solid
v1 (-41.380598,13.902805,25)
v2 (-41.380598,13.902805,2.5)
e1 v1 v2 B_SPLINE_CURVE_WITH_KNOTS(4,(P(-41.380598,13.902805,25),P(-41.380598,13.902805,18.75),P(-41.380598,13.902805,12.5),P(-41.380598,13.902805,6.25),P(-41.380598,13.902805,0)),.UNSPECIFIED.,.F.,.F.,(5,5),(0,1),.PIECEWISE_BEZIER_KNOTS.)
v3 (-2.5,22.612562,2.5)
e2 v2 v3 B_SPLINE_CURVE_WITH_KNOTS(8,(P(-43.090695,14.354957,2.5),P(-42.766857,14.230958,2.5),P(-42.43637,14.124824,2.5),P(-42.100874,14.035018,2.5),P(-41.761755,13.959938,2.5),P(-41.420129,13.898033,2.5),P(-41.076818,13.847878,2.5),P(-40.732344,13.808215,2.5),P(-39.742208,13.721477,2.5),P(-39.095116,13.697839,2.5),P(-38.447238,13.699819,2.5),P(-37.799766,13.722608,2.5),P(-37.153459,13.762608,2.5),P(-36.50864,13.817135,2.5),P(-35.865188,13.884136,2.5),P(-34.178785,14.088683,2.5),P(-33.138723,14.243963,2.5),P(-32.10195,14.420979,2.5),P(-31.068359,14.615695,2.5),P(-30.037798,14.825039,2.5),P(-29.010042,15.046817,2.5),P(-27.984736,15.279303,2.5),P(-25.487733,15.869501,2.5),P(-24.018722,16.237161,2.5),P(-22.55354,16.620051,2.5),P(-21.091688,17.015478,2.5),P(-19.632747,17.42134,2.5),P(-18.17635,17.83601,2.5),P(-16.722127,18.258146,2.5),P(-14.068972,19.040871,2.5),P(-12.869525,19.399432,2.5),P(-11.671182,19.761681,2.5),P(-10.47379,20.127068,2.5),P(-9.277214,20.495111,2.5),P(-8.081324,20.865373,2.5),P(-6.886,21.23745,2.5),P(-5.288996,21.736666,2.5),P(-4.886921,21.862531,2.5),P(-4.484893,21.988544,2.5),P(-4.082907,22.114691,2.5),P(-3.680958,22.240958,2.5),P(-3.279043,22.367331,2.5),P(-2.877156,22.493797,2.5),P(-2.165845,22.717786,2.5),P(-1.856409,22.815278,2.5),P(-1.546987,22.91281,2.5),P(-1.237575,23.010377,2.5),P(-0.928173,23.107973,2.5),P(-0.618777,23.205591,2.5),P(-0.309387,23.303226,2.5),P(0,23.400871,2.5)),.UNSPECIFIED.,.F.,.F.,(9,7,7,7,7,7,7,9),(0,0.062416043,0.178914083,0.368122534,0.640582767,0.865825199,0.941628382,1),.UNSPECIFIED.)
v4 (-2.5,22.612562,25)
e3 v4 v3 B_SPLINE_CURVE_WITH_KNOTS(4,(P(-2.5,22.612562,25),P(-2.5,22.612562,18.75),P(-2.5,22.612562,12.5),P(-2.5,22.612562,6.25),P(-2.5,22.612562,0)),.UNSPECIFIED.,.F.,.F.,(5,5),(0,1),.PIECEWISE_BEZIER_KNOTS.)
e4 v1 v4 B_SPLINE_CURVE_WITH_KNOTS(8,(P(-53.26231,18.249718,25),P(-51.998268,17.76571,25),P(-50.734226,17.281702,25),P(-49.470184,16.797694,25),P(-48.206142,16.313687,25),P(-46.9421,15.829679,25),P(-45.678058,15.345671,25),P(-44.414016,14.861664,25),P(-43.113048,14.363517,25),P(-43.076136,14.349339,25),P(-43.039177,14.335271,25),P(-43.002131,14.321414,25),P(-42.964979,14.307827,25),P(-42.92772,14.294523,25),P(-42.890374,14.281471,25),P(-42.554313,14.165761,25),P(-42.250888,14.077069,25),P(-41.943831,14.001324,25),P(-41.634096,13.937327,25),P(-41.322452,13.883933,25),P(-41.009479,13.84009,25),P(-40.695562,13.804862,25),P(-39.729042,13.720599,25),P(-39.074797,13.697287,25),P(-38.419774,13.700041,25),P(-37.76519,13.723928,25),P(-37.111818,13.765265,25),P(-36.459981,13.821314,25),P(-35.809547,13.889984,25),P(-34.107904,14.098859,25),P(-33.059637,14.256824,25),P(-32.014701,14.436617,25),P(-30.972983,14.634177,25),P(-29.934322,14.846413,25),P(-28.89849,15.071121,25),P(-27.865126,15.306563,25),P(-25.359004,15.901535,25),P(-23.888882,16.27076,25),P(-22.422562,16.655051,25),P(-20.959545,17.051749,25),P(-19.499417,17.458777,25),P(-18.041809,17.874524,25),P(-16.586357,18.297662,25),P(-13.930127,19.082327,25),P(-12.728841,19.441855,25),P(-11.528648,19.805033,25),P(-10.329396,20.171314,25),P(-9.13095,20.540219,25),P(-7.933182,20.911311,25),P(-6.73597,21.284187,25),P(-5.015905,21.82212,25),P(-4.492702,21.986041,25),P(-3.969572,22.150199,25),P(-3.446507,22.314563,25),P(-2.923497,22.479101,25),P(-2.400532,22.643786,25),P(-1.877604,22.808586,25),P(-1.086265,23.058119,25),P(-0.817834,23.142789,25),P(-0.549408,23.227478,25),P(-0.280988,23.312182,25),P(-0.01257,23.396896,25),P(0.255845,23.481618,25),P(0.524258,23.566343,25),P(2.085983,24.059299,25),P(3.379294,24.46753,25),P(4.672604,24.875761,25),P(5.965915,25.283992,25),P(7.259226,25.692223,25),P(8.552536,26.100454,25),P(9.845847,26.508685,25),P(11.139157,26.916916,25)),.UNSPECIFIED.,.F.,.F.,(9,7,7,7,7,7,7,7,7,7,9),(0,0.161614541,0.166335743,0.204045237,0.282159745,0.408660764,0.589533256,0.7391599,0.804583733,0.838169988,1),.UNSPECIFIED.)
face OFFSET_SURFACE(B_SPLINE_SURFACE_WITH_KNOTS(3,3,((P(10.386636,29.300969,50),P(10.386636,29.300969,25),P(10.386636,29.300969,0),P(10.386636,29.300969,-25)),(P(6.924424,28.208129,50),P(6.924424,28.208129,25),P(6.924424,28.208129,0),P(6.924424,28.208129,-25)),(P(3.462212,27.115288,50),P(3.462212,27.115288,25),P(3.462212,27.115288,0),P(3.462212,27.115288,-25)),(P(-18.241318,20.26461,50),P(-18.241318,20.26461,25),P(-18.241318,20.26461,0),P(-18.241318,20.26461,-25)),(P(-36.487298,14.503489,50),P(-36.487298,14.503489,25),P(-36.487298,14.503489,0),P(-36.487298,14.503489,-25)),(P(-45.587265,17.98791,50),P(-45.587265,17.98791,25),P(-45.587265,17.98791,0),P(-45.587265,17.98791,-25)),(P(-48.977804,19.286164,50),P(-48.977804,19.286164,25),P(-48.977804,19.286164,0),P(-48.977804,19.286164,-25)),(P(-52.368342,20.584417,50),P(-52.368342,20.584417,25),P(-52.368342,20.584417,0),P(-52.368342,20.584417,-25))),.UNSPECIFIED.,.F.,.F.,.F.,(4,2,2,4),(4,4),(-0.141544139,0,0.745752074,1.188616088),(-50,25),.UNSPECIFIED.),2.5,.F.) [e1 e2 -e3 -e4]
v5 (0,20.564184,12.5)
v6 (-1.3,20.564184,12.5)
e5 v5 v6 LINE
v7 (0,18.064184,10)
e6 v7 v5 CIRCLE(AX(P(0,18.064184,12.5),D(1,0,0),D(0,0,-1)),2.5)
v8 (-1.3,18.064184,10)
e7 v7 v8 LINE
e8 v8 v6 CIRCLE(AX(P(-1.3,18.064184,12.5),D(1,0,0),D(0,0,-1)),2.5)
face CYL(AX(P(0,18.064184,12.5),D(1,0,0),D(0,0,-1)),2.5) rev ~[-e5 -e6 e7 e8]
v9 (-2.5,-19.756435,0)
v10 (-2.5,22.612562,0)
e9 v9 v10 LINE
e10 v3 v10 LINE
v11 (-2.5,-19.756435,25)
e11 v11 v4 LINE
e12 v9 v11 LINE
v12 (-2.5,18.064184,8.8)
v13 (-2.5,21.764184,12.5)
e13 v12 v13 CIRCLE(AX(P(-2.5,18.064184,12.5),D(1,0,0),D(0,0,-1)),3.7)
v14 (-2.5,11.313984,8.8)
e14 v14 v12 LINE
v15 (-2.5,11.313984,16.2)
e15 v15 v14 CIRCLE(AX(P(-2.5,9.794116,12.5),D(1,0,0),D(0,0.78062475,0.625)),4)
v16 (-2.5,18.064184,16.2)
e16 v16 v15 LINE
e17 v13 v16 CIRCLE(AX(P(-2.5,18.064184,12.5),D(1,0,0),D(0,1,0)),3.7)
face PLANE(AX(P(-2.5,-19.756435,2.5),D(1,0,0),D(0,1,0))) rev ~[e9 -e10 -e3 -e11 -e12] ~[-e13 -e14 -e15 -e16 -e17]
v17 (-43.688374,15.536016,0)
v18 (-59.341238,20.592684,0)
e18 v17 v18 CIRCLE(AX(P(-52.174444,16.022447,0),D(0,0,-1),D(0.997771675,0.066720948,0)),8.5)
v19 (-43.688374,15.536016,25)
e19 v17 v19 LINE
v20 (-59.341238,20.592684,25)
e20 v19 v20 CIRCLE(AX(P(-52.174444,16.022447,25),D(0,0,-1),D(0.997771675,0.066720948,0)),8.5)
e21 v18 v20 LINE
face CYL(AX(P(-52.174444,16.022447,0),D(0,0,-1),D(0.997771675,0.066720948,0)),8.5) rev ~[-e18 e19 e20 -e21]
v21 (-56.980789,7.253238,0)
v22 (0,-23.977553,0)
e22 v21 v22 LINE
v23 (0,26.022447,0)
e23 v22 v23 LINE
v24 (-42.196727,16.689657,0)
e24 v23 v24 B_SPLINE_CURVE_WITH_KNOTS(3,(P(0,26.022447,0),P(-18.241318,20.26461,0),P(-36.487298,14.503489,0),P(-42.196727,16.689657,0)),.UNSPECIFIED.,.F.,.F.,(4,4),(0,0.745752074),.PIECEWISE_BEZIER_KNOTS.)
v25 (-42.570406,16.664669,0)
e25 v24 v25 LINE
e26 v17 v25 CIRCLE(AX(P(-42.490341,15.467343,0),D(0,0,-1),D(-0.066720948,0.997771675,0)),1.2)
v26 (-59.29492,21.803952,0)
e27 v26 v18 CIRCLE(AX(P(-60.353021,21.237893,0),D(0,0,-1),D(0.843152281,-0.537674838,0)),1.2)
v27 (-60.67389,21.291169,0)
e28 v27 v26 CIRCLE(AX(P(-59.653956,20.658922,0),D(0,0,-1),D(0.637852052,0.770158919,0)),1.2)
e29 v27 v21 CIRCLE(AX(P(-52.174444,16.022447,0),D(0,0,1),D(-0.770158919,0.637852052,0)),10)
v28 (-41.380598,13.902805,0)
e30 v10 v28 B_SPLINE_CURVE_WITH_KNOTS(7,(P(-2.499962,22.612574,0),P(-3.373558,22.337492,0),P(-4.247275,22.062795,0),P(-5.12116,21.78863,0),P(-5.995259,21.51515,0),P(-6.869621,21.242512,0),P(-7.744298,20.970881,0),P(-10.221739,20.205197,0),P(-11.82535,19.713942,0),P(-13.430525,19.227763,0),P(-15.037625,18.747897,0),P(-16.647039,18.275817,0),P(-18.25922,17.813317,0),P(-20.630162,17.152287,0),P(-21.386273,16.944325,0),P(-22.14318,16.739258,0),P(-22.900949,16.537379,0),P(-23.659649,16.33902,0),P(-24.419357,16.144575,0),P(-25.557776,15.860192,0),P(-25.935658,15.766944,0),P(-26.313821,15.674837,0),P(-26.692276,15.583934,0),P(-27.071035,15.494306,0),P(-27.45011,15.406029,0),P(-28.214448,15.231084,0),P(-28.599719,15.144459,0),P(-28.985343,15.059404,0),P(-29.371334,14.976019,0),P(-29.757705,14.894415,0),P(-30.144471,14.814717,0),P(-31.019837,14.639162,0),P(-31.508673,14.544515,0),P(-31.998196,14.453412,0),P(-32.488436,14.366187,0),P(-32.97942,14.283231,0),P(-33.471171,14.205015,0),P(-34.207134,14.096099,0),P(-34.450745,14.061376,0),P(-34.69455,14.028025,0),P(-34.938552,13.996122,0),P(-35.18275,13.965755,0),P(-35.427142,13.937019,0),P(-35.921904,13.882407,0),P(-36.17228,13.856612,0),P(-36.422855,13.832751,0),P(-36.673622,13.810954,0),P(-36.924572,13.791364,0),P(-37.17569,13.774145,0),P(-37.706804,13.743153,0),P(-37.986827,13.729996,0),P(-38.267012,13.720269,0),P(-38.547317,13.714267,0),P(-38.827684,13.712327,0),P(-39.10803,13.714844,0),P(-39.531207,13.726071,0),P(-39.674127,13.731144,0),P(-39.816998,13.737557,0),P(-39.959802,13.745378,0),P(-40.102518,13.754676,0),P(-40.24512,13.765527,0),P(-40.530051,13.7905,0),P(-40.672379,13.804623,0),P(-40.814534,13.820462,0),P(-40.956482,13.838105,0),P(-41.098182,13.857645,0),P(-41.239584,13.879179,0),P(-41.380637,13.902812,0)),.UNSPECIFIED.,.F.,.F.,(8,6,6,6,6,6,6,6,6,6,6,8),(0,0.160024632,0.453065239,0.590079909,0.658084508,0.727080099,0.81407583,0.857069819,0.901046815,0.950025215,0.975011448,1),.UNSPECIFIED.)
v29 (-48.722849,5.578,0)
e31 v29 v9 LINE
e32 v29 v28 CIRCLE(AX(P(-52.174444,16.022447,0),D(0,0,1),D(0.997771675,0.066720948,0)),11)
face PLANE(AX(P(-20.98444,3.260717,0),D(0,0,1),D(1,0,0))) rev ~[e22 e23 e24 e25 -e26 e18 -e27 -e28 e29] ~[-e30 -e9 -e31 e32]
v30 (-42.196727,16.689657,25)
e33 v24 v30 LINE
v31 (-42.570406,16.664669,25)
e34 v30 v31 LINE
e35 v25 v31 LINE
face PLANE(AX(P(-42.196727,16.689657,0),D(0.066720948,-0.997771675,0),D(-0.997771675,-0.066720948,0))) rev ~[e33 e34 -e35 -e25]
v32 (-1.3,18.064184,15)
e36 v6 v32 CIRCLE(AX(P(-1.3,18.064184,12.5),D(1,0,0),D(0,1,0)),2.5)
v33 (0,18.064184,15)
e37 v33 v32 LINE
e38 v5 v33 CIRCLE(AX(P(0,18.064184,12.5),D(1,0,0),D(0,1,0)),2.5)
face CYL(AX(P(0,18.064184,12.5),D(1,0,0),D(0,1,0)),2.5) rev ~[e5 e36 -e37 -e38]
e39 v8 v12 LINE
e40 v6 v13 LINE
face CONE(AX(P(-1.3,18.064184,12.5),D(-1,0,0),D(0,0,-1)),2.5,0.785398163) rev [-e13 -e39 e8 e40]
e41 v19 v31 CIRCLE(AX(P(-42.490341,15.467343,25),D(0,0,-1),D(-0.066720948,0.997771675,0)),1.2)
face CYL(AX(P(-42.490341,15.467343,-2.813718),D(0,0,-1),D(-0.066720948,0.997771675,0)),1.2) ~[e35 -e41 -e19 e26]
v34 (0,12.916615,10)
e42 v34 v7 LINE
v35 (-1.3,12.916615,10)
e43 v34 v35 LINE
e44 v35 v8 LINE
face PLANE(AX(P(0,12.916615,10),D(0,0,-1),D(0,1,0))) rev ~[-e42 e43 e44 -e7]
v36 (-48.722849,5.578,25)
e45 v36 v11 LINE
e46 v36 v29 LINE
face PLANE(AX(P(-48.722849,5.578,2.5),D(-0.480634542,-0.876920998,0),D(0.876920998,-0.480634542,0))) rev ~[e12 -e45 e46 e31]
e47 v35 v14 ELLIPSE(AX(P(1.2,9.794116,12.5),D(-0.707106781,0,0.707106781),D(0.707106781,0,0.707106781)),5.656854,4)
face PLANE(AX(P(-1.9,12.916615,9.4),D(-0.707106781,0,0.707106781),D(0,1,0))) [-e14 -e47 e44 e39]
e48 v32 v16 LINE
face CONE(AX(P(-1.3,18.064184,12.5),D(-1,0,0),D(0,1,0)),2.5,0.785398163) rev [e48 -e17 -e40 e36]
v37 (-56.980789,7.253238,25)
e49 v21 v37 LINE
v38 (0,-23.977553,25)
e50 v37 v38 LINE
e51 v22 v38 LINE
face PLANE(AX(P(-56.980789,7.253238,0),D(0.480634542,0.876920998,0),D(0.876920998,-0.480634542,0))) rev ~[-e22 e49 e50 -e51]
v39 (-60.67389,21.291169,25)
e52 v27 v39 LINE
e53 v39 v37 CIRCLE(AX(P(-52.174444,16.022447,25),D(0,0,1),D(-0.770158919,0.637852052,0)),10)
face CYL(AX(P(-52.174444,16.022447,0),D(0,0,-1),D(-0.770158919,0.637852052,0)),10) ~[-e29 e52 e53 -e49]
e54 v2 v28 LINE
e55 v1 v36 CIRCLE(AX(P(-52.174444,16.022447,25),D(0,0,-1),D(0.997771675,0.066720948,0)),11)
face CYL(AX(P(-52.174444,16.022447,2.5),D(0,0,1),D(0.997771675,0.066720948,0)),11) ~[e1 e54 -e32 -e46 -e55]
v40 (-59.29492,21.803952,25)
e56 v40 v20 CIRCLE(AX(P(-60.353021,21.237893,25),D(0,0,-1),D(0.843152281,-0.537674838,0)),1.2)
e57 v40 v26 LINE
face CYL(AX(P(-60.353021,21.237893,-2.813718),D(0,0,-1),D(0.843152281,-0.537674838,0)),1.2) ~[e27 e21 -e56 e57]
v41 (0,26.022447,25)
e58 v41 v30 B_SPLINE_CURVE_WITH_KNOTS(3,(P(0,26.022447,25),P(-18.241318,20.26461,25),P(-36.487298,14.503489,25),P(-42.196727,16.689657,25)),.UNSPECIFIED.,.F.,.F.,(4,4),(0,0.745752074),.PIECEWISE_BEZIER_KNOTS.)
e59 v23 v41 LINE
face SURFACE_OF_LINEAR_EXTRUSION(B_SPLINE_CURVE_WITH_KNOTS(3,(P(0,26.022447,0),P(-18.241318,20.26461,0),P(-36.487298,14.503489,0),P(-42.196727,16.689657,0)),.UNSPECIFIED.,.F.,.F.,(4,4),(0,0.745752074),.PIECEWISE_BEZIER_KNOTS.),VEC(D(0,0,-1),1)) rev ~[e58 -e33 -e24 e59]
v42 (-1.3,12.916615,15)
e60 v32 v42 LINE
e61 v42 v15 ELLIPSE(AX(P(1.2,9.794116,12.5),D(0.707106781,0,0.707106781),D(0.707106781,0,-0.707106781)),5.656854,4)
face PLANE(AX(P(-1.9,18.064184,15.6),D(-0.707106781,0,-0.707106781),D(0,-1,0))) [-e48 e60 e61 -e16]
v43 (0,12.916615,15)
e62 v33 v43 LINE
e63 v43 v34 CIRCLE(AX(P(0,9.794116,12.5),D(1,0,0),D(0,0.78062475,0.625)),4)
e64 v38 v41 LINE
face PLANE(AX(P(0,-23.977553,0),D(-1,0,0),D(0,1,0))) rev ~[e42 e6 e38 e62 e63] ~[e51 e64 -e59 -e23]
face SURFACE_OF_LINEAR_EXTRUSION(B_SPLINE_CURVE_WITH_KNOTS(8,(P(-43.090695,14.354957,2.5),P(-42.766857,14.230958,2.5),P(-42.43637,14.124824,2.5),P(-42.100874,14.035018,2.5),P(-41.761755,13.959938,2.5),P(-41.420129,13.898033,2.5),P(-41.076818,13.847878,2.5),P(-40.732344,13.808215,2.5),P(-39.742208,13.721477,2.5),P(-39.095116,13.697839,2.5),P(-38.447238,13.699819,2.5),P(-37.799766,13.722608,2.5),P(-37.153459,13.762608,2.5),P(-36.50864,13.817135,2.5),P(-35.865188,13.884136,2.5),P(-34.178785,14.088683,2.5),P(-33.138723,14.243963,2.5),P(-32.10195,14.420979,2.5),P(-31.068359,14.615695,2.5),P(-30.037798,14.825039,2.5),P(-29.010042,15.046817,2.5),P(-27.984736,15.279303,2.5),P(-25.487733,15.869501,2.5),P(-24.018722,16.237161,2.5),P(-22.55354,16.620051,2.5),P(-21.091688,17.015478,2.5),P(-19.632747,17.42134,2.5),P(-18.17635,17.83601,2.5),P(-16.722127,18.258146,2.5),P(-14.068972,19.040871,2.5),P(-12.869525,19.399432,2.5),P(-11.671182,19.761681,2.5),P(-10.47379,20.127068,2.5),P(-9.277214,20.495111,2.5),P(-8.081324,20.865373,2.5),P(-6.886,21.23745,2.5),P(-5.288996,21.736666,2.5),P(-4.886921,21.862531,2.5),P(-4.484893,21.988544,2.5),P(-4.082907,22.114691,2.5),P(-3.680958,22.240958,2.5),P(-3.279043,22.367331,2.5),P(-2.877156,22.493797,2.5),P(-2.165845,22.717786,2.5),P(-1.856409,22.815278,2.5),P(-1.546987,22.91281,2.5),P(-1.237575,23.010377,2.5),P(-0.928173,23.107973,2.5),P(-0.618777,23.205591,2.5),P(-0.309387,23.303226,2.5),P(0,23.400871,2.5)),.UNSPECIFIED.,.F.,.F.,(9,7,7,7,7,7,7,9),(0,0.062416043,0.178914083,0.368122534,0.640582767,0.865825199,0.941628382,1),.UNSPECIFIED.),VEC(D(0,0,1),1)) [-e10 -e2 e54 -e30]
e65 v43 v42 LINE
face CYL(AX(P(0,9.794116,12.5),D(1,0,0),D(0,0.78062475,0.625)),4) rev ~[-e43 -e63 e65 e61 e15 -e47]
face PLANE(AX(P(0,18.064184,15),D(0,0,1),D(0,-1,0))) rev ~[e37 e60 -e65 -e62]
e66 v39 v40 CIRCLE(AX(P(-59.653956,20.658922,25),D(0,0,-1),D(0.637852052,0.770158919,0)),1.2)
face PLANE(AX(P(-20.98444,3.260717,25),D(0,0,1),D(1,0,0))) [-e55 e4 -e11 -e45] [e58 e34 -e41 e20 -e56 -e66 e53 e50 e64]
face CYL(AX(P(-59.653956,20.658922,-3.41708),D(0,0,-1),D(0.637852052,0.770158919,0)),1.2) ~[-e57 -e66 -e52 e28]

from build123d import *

# Parameters (mm, degrees)
F1_DEPTH    = 25
F2_T1_DEPTH = 30.6274350033
F2_T3_DEPTH = 31.8341602247
F3_T        = -2.5
F4_DEPTH    = 25
F6_DEPTH    = 3
F7_SIZE     = 1.2


# Not quite as in the source:
# - a fillet or chamfer that OpenCascade refuses, or shapes differently, is made with other operations: its cross-section is extruded or revolved along the edge and cut away or added


with BuildPart() as f1:
    # F0 (on Top) → F1 (new body)
    with BuildSketch(Plane.XY):
        with BuildLine():
            Line((0, -23.9775525033), (0, 0))
            Line((0, 0), (0, 26.0224474967))
            add(Edge.make_bspline(
                [(0, 26.0224474967), (-18.2413181838, 20.2646104982), (-36.4872975651, 14.5034889639), (-42.1967271812, 16.6896569806)],
                knots=[0, 0, 0, 0, 0.7457520739, 0.7457520739, 0.7457520739, 0.7457520739], degree=3))
            ThreePointArc((-42.1967271812, 16.6896569806), (-46.7941768856, 7.5931695596), (-56.9807893445, 7.2532375123))
            Line((-56.9807893445, 7.2532375123), (0, -23.9775525033))
        make_face()
        with BuildLine():
            ThreePointArc((-56.9807893445, 7.2532375123), (-46.7941768856, 7.5931695596), (-42.1967271812, 16.6896569806))
            Line((-42.1967271812, 16.6896569806), (-43.6933846934, 16.589575558))
            ThreePointArc((-43.6933846934, 16.589575558), (-54.7874105132, 7.9340356852), (-58.7207947374, 21.4441899376))
            Line((-58.7207947374, 21.4441899376), (-59.8760331153, 22.4009680155))
            ThreePointArc((-59.8760331153, 22.4009680155), (-61.9966403153, 14.1450934668), (-56.9807893445, 7.2532375123))
        make_face()
    extrude(amount=F1_DEPTH)

    # F2: fillet of radius 1.2 on 3 edges, made by hand

    # F2_s2 → F2_t1 (cut)
    with BuildSketch(Plane.XY.offset(-2.8137175017)):
        with BuildLine():
            ThreePointArc((-59.3412383143, 20.5926836221), (-59.1675384199, 21.4239873058), (-59.5875985888, 22.1620841304))
            Line((-59.5875985888, 22.1620841304), (-58.7207947374, 21.4441899376))
            ThreePointArc((-58.7207947374, 21.4441899376), (-59.0442222025, 21.0280589954), (-59.3412383143, 20.5926836221))
        make_face()
        with BuildLine():
            ThreePointArc((-42.5704056438, 16.6646691181), (-43.3428946364, 16.3118260592), (-43.6883739189, 15.5360158161))
            ThreePointArc((-43.6883739189, 15.5360158161), (-43.6745400624, 16.0628733972), (-43.6933846934, 16.589575558))
            Line((-43.6933846934, 16.589575558), (-42.5704056438, 16.6646691181))
        make_face()
    extrude(amount=F2_T1_DEPTH, mode=Mode.SUBTRACT)

    # F2_s4 → F2_t3 (cut)
    with BuildSketch(Plane.XY.offset(-3.4170801123)):
        with BuildLine():
            ThreePointArc((-58.8885337226, 21.5831127668), (-59.8476100394, 21.8431932263), (-60.6738896743, 21.2911685965))
            ThreePointArc((-60.6738896743, 21.2911685965), (-60.2939449544, 21.8597159591), (-59.8760331153, 22.4009680155))
            Line((-59.8760331153, 22.4009680155), (-58.8885337226, 21.5831127668))
        make_face()
    extrude(amount=F2_T3_DEPTH, mode=Mode.SUBTRACT)

    # F3
    f3_openings = [f1.faces().sort_by_distance(p)[0] for p in [
        (-19.977186, 3.669983, 25),
    ]]
    offset(amount=F3_T, openings=f3_openings)

    # F4 (cut): a face of the model
    f4_faces = [f1.faces().sort_by_distance(p)[0] for p in [
        (-18.9574034875, 3.5679781743, 2.5),
    ]]
    extrude(f4_faces, amount=-F4_DEPTH, mode=Mode.SUBTRACT)

    # F5 (on face) → F6 (cut)
    with BuildSketch(Plane.YZ):
        with BuildLine():
            ThreePointArc((12.9166145043, 10), (13.5683701333, 11.1752351146), (13.7941155051, 12.5))
            ThreePointArc((13.7941155051, 12.5), (13.5683701333, 13.8247648854), (12.9166145043, 15))
            ThreePointArc((12.9166145043, 15), (5.7941155051, 12.5), (12.9166145043, 10))
        make_face()
        with BuildLine():
            ThreePointArc((20.5641841143, 12.5), (19.8319510673, 14.267766953), (18.0641841143, 15))
            ThreePointArc((18.0641841143, 15), (15.5641841143, 12.5), (18.0641841143, 10))
            ThreePointArc((18.0641841143, 10), (19.8319510673, 10.732233047), (20.5641841143, 12.5))
        make_face()
        with BuildLine():
            ThreePointArc((12.9166145043, 15), (13.5683701333, 13.8247648854), (13.7941155051, 12.5))
            ThreePointArc((13.7941155051, 12.5), (13.5683701333, 11.1752351146), (12.9166145043, 10))
            Line((12.9166145043, 10), (18.0641841143, 10))
            ThreePointArc((18.0641841143, 10), (15.5641841143, 12.5), (18.0641841143, 15))
            Line((18.0641841143, 15), (12.9166145043, 15))
        make_face()
    extrude(amount=-F6_DEPTH, mode=Mode.SUBTRACT)

    # F7
    f7_edges = [f1.edges().sort_by_distance(p)[0] for p in [
        (-2.5, 15.490399, 10),
        (-2.5, 15.490399, 15),
        (-2.5, 20.564184, 12.5),
    ]]
    chamfer(f7_edges, length=F7_SIZE)


solid = f1.part
